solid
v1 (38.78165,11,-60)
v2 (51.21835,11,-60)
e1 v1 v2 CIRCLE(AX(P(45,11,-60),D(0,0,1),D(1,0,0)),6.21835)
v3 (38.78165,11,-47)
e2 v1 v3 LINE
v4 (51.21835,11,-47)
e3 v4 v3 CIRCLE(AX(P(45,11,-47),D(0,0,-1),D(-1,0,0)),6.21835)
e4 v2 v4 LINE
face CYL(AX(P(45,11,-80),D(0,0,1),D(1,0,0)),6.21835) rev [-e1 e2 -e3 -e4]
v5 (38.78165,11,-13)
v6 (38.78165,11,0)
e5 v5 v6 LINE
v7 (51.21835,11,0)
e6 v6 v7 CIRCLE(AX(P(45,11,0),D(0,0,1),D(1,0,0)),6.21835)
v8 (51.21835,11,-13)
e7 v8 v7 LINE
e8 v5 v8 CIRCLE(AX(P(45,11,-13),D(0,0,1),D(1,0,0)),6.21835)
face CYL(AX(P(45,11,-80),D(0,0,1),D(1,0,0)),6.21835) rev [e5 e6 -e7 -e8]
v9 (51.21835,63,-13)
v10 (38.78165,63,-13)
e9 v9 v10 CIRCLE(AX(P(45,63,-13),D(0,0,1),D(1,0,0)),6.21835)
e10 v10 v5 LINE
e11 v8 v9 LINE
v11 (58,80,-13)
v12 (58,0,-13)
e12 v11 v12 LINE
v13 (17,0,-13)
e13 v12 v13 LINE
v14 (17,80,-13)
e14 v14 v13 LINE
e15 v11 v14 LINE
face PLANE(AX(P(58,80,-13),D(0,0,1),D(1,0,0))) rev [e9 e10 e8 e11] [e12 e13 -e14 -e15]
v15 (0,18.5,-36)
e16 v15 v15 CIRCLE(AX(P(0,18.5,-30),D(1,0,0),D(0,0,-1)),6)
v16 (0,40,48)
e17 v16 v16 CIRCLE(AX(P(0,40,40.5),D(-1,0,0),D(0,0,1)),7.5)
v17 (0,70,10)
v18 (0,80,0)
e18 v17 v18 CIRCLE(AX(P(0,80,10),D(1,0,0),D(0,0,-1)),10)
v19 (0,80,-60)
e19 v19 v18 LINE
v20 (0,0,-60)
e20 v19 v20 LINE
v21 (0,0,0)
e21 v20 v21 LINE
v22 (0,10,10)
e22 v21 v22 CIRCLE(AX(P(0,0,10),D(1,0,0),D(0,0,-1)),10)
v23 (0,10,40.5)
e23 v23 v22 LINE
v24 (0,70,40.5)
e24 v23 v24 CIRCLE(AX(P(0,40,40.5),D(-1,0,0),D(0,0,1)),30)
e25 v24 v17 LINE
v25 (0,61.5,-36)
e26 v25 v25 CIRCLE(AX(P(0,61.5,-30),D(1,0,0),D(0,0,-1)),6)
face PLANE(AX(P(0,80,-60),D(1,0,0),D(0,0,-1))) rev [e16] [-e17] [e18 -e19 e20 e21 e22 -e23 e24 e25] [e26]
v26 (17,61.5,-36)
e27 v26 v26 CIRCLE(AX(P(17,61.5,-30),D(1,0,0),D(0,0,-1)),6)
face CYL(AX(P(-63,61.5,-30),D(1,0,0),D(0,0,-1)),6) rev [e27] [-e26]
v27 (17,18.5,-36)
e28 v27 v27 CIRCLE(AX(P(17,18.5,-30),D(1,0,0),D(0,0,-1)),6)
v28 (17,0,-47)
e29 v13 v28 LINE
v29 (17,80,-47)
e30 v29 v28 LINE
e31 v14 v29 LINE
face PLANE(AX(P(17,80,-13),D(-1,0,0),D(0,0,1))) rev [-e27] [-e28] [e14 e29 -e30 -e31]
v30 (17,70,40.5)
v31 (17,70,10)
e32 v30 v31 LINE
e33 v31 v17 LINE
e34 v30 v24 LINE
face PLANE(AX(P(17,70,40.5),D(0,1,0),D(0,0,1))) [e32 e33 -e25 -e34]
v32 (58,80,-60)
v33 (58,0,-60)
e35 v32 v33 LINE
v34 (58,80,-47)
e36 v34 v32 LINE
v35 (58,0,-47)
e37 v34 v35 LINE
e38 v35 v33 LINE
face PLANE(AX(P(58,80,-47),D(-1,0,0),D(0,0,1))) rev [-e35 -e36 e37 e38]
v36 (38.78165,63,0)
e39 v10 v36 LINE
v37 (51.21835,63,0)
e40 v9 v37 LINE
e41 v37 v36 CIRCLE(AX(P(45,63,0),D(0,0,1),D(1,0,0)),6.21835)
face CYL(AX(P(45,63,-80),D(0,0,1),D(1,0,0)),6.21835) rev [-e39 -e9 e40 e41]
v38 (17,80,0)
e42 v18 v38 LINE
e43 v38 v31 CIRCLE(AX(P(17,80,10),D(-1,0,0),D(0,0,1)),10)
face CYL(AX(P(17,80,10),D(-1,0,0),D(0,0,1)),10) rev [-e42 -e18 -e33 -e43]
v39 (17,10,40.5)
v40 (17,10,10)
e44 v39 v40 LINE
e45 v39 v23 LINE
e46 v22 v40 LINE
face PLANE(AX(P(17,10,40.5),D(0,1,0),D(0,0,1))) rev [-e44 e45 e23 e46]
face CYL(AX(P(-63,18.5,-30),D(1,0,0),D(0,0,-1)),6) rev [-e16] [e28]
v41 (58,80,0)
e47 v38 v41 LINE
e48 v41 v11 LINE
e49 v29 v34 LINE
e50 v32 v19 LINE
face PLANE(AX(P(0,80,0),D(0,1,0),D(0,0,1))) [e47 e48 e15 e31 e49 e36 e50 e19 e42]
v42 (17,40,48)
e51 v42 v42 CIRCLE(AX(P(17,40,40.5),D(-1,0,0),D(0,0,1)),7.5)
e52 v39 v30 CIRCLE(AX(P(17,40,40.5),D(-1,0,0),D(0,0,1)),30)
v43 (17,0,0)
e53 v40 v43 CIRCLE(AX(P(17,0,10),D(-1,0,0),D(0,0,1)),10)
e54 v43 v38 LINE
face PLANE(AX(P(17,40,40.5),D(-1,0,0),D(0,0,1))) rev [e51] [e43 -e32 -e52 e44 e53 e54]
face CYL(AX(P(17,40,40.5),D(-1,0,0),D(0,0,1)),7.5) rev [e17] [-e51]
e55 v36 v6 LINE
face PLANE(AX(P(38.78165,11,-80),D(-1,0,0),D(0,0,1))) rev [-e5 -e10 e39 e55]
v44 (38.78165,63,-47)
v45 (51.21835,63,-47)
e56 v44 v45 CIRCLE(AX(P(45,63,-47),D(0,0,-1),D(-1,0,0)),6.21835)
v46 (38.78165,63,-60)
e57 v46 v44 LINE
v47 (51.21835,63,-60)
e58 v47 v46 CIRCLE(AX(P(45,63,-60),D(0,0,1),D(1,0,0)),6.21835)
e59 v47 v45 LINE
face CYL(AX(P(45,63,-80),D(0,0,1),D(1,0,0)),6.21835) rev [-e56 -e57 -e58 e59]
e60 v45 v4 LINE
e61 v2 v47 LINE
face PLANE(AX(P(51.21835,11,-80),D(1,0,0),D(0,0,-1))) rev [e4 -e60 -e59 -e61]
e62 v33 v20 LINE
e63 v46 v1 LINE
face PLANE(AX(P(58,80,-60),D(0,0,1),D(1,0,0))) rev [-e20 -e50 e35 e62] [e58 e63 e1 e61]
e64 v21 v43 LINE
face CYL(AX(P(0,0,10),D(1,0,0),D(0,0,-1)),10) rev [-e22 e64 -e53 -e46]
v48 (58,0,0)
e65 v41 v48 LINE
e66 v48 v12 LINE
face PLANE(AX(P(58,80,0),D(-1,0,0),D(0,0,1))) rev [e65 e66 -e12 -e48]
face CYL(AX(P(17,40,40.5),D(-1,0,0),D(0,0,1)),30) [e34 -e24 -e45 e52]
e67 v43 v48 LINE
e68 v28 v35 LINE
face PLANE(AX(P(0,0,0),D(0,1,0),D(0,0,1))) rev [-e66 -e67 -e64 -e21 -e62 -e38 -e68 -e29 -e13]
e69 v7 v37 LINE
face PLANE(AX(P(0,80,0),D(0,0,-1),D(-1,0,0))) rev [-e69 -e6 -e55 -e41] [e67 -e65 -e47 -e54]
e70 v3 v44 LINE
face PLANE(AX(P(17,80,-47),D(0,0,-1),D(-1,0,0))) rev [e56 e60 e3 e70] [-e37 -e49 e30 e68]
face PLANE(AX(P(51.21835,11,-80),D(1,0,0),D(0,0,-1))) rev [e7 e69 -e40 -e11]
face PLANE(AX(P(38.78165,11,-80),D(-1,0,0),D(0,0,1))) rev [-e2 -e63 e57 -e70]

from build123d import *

# Parameters (mm, degrees)
BOSS_EXTRUDE1_DEPTH = 80
CUT_EXTRUDE1_DEPTH  = 80
SKETCH4_R           = 6
CUT_EXTRUDE4_DEPTH  = 80
BOSS_EXTRUDE2_DEPTH = 17
SKETCH9_R           = 7.5
CUT_EXTRUDE5_DEPTH  = 17
FILLET2_R           = 10
FILLET3_R           = 10


with BuildPart() as part:
    # Sketch1 → Boss-Extrude1 (new body)
    with BuildSketch(Plane(origin=(0, 0, 0), x_dir=(1, 0, 0), z_dir=(0, 1, 0))):
        Polygon((0, 0), (58, 0), (58, 13), (17, 13), (17, 47), (58, 47), (58, 60), (0, 60), align=None)
    extrude(amount=BOSS_EXTRUDE1_DEPTH)

    # Sketch2 → Cut-Extrude1 (cut)
    with BuildSketch(Plane.XY):
        with BuildLine():
            Line((38.781649875, 11), (38.781649875, 63))
            ThreePointArc((38.781649875, 63), (45, 69.218350125), (51.218350125, 63))
            Line((51.218350125, 63), (51.218350125, 11))
            ThreePointArc((51.218350125, 11), (45, 4.781649875), (38.781649875, 11))
        make_face()
    extrude(amount=-CUT_EXTRUDE1_DEPTH, mode=Mode.SUBTRACT)

    # Sketch4 → Cut-Extrude4 (cut)
    with BuildSketch(Plane(origin=(17, 0, 0), x_dir=(0, 0, -1), z_dir=(1, 0, 0))):
        with Locations((30, 18.5)):
            Circle(SKETCH4_R)
        with Locations((30, 61.5)):
            Circle(SKETCH4_R)
    extrude(amount=-CUT_EXTRUDE4_DEPTH, mode=Mode.SUBTRACT)

    # Sketch8 → Boss-Extrude2 (add)
    with BuildSketch(Plane.ZY):
        with BuildLine():
            Line((40.5, 70), (0, 70))
            Line((0, 70), (0, 10))
            Line((0, 10), (40.5, 10))
            ThreePointArc((40.5, 10), (70.5, 40), (40.5, 70))
        make_face()
    extrude(amount=-BOSS_EXTRUDE2_DEPTH)

    # Sketch9 → Cut-Extrude5 (cut)
    with BuildSketch(Plane.ZY):
        with Locations((40.5, 40)):
            Circle(SKETCH9_R)
    extrude(amount=-CUT_EXTRUDE5_DEPTH, mode=Mode.SUBTRACT)

    # Fillet2
    fillet2_edges = [part.edges().sort_by_distance(p)[0] for p in [
        (8.5, 70, 0),
    ]]
    fillet(fillet2_edges, radius=FILLET2_R - 0.0001)  # a hair under: the kernel refuses the full size

    # Fillet3
    fillet3_edges = [part.edges().sort_by_distance(p)[0] for p in [
        (8.5, 10, 0),
    ]]
    fillet(fillet3_edges, radius=FILLET3_R - 0.0001)  # a hair under: the kernel refuses the full size


solid = part.part
